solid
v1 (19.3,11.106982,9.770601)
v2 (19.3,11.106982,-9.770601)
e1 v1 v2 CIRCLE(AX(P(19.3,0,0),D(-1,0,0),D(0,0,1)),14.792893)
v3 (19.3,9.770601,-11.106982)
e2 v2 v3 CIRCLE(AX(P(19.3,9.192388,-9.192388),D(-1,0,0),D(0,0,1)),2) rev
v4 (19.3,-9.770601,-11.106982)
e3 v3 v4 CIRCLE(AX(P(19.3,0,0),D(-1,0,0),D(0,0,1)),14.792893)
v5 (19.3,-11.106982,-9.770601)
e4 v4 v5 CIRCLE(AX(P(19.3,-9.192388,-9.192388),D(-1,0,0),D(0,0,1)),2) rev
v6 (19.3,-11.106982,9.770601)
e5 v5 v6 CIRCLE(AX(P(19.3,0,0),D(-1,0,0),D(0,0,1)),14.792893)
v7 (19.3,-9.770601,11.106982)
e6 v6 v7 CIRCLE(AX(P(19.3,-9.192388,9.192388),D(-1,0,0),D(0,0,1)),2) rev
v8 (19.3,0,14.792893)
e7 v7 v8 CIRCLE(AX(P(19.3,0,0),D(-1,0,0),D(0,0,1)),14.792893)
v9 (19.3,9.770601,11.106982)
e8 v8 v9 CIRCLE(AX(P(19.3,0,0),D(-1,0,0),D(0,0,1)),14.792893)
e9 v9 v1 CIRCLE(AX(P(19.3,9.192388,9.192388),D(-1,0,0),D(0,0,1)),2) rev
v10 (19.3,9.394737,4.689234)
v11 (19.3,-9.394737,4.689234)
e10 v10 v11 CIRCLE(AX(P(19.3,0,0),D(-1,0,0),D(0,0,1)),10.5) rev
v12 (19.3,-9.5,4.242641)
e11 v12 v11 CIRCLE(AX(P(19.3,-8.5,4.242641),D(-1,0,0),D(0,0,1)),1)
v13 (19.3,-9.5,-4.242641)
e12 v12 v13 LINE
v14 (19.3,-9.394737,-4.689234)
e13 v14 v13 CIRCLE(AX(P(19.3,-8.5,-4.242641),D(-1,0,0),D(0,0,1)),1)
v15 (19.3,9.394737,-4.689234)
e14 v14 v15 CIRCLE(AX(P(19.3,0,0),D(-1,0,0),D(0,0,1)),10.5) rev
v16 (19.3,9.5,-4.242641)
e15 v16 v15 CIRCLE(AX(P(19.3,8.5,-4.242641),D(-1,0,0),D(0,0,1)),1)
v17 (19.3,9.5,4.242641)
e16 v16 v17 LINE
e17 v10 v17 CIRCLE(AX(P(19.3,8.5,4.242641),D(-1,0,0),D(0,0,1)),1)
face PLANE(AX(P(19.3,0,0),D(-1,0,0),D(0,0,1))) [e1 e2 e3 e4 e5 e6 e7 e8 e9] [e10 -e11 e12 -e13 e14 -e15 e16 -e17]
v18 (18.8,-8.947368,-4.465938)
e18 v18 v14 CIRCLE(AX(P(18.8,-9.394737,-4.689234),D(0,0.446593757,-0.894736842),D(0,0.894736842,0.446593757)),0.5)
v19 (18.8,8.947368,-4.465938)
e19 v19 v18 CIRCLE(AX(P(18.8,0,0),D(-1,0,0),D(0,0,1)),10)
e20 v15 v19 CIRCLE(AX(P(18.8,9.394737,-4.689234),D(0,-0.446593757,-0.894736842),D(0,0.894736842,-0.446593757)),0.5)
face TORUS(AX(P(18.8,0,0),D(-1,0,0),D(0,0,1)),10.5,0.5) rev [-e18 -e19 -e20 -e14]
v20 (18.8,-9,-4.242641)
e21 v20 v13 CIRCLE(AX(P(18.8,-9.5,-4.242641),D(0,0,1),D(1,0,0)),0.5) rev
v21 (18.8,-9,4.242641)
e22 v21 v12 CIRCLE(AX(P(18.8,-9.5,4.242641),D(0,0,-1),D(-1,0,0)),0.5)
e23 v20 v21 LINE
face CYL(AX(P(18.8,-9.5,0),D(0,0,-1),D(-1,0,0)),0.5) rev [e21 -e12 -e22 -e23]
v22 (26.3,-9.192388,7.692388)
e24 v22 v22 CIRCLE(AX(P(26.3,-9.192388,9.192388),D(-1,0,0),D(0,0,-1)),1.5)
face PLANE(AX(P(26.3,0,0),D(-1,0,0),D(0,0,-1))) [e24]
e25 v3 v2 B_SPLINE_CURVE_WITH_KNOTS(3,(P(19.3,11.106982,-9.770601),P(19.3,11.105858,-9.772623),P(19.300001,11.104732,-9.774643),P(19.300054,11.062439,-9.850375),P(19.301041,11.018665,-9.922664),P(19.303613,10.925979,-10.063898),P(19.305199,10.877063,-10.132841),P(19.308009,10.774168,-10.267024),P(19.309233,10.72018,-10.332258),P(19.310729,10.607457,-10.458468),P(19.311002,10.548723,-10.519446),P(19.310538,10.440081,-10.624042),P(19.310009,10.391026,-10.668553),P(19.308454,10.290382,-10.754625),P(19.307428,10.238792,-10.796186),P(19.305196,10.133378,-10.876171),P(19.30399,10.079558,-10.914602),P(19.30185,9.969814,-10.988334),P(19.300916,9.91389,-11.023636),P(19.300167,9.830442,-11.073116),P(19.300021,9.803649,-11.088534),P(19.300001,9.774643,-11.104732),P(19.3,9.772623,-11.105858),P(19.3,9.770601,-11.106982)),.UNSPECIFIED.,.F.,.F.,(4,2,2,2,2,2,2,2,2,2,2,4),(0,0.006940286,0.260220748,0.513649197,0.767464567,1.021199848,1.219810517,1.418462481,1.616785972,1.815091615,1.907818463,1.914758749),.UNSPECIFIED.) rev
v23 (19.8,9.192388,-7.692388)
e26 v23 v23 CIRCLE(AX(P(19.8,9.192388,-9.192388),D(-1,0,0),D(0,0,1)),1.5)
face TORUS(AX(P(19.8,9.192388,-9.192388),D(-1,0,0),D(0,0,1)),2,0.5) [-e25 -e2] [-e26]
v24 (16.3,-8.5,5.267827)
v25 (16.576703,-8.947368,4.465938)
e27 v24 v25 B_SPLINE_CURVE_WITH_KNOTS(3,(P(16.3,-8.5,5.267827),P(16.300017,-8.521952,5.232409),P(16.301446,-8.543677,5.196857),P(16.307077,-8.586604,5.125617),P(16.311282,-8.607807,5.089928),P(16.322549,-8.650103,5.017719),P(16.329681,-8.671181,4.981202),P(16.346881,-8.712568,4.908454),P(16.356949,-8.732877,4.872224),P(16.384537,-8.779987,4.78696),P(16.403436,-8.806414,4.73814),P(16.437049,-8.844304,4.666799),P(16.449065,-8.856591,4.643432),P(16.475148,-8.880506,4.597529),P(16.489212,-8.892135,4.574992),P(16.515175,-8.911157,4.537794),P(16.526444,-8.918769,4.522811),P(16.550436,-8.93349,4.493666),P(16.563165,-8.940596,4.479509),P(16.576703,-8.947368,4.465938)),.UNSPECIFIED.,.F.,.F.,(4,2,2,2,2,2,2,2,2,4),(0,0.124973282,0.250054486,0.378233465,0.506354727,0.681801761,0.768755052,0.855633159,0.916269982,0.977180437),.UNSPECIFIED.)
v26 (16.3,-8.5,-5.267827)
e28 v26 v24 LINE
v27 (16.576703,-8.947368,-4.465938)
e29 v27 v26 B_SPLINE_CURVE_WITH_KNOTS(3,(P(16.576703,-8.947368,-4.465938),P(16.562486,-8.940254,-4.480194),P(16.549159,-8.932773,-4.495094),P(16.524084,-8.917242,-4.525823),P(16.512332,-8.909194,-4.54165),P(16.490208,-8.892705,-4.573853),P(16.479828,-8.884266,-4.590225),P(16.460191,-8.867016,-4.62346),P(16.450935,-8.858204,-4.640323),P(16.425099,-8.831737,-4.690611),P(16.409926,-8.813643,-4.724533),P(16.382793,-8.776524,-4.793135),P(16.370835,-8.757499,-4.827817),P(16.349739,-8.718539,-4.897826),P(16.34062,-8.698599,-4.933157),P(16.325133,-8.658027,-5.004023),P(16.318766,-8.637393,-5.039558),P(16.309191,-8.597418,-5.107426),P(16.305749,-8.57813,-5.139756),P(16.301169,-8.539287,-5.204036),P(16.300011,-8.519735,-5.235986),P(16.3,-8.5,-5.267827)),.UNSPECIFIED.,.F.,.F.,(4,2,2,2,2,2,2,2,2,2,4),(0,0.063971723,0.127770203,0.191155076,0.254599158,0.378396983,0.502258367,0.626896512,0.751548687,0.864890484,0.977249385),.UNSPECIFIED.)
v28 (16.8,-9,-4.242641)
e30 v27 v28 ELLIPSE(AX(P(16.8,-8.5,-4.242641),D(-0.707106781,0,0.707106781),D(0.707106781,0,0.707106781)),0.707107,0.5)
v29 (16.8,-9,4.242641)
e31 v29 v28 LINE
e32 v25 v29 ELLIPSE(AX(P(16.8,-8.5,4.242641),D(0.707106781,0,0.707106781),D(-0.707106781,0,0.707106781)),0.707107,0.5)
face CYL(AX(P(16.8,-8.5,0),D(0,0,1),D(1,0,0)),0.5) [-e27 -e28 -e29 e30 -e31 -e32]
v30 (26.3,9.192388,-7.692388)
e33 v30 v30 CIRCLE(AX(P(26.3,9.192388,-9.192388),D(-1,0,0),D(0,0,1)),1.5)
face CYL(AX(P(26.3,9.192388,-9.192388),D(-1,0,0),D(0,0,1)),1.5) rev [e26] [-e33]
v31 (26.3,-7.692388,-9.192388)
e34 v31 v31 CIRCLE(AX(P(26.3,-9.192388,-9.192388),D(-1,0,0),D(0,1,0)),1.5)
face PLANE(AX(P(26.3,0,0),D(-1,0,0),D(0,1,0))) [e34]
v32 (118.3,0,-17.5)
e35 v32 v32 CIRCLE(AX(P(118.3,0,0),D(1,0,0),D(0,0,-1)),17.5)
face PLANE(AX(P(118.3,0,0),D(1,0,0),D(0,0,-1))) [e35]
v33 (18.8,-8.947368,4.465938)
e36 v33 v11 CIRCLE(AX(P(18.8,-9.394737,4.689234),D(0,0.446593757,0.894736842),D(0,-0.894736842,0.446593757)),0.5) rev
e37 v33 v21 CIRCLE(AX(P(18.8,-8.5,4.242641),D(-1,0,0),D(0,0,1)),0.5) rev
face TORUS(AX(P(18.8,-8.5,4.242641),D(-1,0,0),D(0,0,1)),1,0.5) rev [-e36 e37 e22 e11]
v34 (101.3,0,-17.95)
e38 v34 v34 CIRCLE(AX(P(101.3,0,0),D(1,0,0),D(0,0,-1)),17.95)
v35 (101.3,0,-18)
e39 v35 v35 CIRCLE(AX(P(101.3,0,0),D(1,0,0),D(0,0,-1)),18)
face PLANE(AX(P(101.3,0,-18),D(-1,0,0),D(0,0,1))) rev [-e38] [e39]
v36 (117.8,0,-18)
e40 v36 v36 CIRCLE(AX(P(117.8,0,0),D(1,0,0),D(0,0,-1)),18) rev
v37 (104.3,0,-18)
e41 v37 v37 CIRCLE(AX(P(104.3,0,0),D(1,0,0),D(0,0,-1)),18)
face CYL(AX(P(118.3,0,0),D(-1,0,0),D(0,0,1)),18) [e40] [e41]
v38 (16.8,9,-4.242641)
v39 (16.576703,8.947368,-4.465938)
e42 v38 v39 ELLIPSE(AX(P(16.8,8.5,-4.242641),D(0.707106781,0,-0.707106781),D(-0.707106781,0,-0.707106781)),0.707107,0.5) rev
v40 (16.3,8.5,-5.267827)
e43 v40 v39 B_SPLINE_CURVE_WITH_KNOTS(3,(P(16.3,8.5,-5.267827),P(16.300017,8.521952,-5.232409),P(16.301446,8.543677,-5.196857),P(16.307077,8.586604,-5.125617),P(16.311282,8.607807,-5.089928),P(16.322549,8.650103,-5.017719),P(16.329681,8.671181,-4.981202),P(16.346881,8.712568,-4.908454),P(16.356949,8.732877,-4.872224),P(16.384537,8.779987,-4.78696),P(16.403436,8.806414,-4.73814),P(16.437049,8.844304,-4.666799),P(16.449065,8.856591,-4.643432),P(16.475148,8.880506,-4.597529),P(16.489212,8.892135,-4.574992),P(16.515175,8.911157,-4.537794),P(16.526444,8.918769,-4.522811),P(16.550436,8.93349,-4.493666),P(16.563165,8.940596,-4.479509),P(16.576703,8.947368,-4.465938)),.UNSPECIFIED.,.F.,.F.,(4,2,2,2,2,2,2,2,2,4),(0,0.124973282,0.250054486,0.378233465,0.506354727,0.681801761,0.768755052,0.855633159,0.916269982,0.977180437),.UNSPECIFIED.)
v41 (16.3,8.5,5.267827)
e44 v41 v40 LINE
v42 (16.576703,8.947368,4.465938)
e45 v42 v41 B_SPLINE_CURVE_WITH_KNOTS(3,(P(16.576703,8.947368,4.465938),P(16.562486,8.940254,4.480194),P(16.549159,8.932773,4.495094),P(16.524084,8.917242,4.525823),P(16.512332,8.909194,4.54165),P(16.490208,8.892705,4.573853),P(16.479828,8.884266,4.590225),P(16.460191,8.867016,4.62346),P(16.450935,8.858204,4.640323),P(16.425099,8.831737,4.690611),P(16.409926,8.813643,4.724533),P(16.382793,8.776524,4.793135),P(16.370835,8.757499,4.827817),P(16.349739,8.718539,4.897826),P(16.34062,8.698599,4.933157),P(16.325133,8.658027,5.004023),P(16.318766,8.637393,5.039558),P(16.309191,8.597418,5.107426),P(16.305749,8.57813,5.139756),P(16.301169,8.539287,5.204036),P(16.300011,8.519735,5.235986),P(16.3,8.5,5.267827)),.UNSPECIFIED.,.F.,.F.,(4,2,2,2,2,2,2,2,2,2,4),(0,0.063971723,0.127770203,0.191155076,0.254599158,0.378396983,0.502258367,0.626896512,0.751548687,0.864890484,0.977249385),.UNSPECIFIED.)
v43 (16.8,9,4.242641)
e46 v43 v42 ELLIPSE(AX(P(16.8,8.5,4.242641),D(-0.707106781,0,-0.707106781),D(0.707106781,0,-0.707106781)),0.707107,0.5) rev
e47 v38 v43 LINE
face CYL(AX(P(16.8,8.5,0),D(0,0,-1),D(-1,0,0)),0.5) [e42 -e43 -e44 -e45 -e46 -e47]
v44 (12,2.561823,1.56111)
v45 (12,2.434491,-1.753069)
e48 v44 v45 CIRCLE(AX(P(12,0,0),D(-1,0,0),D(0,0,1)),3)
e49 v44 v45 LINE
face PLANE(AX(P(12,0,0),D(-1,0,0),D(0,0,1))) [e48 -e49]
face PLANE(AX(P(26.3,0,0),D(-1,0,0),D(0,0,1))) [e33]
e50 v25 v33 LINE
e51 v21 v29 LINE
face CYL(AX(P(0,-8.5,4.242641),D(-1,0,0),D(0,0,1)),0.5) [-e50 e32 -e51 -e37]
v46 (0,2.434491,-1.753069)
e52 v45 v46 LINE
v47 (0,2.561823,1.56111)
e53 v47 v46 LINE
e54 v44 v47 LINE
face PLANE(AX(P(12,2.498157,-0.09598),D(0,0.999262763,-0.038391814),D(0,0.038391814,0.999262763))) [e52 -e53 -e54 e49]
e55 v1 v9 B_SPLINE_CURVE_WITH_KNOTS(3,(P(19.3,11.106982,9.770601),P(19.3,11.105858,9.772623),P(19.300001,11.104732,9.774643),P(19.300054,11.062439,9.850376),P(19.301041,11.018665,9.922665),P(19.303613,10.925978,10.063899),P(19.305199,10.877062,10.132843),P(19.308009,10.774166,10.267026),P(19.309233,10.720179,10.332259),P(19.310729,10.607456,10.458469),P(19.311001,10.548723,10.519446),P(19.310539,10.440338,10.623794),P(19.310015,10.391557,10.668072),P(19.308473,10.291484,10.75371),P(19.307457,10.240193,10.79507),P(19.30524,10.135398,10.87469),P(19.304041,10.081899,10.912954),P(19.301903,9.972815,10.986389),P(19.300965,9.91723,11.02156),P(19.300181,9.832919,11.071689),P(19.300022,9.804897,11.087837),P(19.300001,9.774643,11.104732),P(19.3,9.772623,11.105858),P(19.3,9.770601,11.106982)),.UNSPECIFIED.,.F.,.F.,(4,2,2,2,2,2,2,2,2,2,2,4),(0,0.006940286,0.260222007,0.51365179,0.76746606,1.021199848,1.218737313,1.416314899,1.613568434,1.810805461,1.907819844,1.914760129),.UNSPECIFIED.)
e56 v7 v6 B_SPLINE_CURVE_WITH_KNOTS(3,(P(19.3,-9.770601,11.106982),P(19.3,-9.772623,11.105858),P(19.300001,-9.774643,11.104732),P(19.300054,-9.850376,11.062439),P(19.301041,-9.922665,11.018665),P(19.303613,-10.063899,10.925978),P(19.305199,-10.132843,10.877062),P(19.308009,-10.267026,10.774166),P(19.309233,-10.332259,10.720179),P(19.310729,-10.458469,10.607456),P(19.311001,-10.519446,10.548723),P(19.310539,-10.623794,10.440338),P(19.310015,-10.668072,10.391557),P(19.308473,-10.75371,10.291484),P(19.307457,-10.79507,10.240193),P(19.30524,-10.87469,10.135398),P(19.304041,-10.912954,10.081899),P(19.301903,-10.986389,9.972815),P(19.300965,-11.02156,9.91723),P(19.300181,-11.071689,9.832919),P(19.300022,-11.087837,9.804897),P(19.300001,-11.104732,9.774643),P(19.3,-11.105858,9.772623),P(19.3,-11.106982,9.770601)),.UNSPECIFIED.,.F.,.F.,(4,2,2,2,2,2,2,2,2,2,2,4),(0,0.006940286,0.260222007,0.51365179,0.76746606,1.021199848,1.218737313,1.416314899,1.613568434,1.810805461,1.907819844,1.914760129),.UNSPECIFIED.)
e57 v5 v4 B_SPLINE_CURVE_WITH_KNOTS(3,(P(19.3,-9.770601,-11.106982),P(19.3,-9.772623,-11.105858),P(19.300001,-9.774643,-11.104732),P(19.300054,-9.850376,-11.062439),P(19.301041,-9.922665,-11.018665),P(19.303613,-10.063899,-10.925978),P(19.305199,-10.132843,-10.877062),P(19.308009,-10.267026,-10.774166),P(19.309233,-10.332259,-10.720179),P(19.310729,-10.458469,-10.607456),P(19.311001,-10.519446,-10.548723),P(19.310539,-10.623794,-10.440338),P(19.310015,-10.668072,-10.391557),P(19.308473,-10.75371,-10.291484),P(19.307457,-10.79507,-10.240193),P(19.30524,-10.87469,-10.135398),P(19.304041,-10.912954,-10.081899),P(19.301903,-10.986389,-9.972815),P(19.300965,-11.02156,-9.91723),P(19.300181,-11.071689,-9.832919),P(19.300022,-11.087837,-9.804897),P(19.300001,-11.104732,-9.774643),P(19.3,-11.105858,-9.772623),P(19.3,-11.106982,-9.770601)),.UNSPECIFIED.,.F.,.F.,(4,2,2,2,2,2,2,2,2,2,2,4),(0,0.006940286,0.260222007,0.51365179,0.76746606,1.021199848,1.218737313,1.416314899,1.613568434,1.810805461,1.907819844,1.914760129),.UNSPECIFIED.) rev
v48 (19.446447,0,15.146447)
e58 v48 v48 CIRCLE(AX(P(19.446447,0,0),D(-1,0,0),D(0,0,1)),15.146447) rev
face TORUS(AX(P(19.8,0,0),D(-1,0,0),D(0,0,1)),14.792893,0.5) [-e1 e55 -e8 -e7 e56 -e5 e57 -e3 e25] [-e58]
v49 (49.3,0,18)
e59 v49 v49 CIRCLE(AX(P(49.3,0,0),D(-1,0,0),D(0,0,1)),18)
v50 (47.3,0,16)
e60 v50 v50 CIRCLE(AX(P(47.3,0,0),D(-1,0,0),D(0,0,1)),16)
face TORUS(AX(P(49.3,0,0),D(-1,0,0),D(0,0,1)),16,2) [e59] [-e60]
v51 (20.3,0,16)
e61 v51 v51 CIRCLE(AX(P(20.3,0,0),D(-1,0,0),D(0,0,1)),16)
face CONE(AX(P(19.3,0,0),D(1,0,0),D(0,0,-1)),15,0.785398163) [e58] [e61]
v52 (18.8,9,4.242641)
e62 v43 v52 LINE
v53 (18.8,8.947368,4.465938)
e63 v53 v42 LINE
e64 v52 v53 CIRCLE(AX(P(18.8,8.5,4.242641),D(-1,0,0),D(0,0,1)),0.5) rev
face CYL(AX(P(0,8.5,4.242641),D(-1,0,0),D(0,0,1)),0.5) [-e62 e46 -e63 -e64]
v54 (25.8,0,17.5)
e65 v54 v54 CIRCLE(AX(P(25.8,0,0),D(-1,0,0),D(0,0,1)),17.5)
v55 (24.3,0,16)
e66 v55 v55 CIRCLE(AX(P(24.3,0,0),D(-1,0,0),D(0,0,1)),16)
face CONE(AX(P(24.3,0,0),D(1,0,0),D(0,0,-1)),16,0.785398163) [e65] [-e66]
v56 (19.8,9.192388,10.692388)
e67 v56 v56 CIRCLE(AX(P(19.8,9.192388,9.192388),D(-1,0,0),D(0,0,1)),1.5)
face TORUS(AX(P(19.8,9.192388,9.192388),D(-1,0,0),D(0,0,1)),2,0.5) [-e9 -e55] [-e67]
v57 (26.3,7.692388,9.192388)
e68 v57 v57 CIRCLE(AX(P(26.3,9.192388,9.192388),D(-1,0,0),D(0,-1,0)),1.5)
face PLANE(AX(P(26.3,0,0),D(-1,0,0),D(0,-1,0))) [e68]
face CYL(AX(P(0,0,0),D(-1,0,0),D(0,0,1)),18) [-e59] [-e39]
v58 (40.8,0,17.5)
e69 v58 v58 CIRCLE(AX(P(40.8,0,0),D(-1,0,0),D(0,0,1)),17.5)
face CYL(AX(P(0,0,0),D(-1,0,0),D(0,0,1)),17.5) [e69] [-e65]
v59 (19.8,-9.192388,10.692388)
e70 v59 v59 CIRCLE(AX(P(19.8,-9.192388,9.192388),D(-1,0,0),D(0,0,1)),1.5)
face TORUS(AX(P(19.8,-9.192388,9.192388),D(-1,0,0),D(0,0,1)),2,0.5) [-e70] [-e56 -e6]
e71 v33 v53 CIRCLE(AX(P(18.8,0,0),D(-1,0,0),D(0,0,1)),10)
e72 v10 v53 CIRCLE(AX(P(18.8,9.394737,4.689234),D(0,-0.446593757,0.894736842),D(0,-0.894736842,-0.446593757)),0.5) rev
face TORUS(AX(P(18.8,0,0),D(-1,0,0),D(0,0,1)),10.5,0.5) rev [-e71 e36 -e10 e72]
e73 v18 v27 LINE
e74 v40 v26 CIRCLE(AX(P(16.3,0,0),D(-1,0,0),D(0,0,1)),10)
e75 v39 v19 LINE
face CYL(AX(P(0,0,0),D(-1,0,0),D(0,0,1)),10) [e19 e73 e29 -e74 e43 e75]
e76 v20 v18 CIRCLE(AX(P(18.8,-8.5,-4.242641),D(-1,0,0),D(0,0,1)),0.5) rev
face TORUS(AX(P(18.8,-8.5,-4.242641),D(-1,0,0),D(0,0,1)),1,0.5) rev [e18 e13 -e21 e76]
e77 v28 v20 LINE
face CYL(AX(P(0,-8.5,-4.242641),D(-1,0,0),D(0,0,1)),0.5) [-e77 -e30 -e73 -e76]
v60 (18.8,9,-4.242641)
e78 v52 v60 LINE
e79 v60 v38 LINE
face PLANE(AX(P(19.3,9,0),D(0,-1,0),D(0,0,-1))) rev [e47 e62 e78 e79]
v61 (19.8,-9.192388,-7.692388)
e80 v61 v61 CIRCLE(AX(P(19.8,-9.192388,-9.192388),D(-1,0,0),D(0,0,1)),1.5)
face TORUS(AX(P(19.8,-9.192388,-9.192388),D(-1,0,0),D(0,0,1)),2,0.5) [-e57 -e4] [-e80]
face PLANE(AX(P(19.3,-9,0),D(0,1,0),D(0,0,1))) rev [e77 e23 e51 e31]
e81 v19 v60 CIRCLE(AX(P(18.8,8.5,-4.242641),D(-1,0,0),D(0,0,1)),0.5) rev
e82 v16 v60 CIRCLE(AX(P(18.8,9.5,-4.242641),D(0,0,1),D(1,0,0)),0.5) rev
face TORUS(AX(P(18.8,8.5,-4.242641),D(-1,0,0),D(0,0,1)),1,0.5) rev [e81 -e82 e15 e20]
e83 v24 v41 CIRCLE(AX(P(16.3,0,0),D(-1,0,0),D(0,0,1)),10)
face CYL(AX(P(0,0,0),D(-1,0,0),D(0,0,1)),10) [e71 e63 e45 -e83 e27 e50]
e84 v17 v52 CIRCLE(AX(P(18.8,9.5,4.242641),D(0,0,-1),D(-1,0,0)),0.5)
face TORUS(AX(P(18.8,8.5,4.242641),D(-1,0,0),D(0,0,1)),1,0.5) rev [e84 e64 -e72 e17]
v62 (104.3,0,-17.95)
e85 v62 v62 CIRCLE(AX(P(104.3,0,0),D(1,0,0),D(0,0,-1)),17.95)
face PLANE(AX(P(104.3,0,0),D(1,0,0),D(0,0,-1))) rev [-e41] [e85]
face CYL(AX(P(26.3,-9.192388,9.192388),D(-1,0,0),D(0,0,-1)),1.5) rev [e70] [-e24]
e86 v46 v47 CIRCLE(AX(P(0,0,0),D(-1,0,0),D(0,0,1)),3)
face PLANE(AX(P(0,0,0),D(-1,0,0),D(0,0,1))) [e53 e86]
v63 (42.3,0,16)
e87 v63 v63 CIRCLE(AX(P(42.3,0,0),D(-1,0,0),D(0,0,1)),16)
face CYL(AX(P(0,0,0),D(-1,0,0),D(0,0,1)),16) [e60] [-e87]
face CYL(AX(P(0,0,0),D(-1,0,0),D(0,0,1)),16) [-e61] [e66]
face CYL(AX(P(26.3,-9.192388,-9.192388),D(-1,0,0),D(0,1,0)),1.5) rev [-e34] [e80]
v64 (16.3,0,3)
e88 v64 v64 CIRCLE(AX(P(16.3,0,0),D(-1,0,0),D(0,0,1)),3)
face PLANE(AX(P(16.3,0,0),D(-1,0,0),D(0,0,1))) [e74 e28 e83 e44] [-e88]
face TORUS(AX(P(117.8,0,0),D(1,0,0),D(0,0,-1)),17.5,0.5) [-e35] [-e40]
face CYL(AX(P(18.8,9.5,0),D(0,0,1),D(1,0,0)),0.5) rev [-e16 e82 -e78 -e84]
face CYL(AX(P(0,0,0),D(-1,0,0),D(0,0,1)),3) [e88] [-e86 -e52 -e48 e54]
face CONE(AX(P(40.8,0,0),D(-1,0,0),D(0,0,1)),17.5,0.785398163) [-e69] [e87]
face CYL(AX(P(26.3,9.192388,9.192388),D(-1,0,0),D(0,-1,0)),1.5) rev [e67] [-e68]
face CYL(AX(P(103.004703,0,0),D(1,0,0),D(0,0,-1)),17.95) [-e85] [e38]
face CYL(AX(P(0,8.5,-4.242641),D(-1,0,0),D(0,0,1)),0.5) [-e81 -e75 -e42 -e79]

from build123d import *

# Parameters (mm, degrees)
SKETCH_1_W               = 16.3
SKETCH_1_H               = 3
SKETCH_1_W_2             = 5
SKETCH_1_H_2             = 16
SKETCH_19_W              = 3
SKETCH_19_H              = 0.05
EXTRUDE_START            = 14
SKETCH_20_R              = 18
EXTRUDE_2_DEPTH          = 14
CUT_EXTRUDE_6_DEPTH      = 3
CUT_EXTRUDE_4_DEPTH      = 12
SKETCH_13_R              = 1.5
CUT_EXTRUDE_8_DEPTH      = 7
PATTERN_CIRCULAR_2_COUNT = 4
FILLET_1_R               = 0.5


with BuildPart() as part:
    # Эскиз1 → Повернуть1 основной корпус (revolve)
    with BuildSketch(Plane(origin=(0, 0, 0), x_dir=(1, 0, 0), z_dir=(0, 1, 0)), mode=Mode.PRIVATE) as revolve_1_sk:
        with Locations((8.15, 1.5)):
            Rectangle(SKETCH_1_W, SKETCH_1_H)
        Polygon((16.3, 0), (19.3, 0), (19.3, 10), (16.3, 10), (16.3, 3), align=None)
        Polygon((24.3, 0), (24.3, 16), (20.3, 16), (19.3, 15), (19.3, 10), (19.3, 0), align=None)
        Polygon((40.8, 17.5), (42.3, 16), (42.3, 0), (24.3, 0), (24.3, 16), (25.8, 17.5), align=None)
        with Locations((44.8, 8)):
            Rectangle(SKETCH_1_W_2, SKETCH_1_H_2)
        with BuildLine():
            ThreePointArc((47.3, 16), (47.885786438, 17.414213562), (49.3, 18))
            Line((49.3, 18), (104.3, 18))
            Line((104.3, 18), (104.3, 0))
            Line((104.3, 0), (47.3, 0))
            Line((47.3, 0), (47.3, 16))
        make_face()
    revolve(revolve_1_sk.sketch.rotate(Axis((0, 0, 0), (1, 0, 0)), 180), axis=Axis((0, 0, 0), (1, 0, 0)))

    # Эскиз19 → Вырез-Повернуть2 пластиковая часть (revolve, cut)
    with BuildSketch(Plane(origin=(0, 0, 0), x_dir=(1, 0, 0), z_dir=(0, 1, 0)), mode=Mode.PRIVATE) as cut_revolve_2_sk:
        with Locations((102.8, 17.975)):
            Rectangle(SKETCH_19_W, SKETCH_19_H)
    revolve(cut_revolve_2_sk.sketch.rotate(Axis((103.004702911, 0, 0), (-1, 0, 0)), 180), axis=Axis((103.004702911, 0, 0), (-1, 0, 0)), mode=Mode.SUBTRACT)

    # Эскиз20 → Бобышка-Вытянуть2 пластиковая крышка контактов (add)
    with BuildSketch(Plane(origin=(104.3, 0, 0), x_dir=(0, 0, -1), z_dir=(1, 0, 0)).offset(EXTRUDE_START)):
        with Locations(Location((0, 0, 0), (0, 0, 180))):
            Circle(SKETCH_20_R)
    extrude(amount=-EXTRUDE_2_DEPTH)

    # Эскиз11 → Вырез-Вытянуть6 (cut)
    with BuildSketch(Plane.ZY.offset(-16.3)):
        with BuildLine():
            ThreePointArc((4.358898944, 9), (0, 10), (-4.358898944, 9))
            Line((-4.358898944, 9), (4.358898944, 9))
        make_face()
        with BuildLine():
            Line((4.358898944, -9), (-4.358898944, -9))
            ThreePointArc((-4.358898944, -9), (0, -10), (4.358898944, -9))
        make_face()
    extrude(amount=-CUT_EXTRUDE_6_DEPTH, mode=Mode.SUBTRACT)

    # Эскиз6 → Вырез-Вытянуть4 на оси (cut)
    with BuildSketch(Plane.ZY):
        with BuildLine():
            Line((-1.75306936, 2.434491286), (1.561110291, 2.561822527))
            ThreePointArc((1.561110291, 2.561822527), (-0.115175441, 2.997788288), (-1.75306936, 2.434491286))
        make_face()
    extrude(amount=-CUT_EXTRUDE_4_DEPTH, mode=Mode.SUBTRACT)

    # Эскиз13 → Вырез-Вытянуть8 для винтов (cut)
    with BuildSketch(Plane.ZY.offset(-19.3)):
        with Locations((-9.192388155, 9.192388155)):
            Circle(SKETCH_13_R)
    cut_extrude_8 = extrude(amount=-CUT_EXTRUDE_8_DEPTH, mode=Mode.SUBTRACT)

    # Круговой массив2 для винтов: Вырез-Вытянуть8 для винтов ×4 about axis
    pattern_circular_2_axis = Axis((0, 0, 0), (1, 0, 0))
    for i in range(1, PATTERN_CIRCULAR_2_COUNT):
        add(cut_extrude_8.rotate(pattern_circular_2_axis, i * 360 / PATTERN_CIRCULAR_2_COUNT), mode=Mode.SUBTRACT)

    # Скругление1
    # the kernel refuses this fillet: 0.5 mm, written as the material it takes off along each edge
    with BuildSketch(Plane(origin=(19.3, 0, 0), x_dir=(0, 0, 1), z_dir=(0, 1, 0))) as fillet_1_piece_1:
        with BuildLine():
            CenterArc((15 - FILLET_1_R * 0.414213562373, FILLET_1_R), FILLET_1_R, 270, 45)
            Line((15 - FILLET_1_R * 0.414213562373, 0), (15, 0))
            Line((15, 0), (15 + FILLET_1_R * 0.292893218813, FILLET_1_R * 0.292893218813))
        make_face()
    revolve(axis=Axis((19.3, 0, 0), (1, 0, 0)), mode=Mode.SUBTRACT)
    with BuildSketch(Plane(origin=(118.3, 0, 0), x_dir=(0, 0, 1), z_dir=(0, 1, 0))) as fillet_1_piece_2:
        with BuildLine():
            CenterArc((18 - FILLET_1_R, -FILLET_1_R), FILLET_1_R, 0, 90)
            Line((18 - FILLET_1_R, 0), (18, 0))
            Line((18, 0), (18, -FILLET_1_R))
        make_face()
    revolve(axis=Axis((118.3, 0, 0), (1, 0, 0)), mode=Mode.SUBTRACT)
    with BuildSketch(Plane(origin=(16.001803864, 9, -4.358898944), x_dir=(0, 0, 1), z_dir=(1, 0, 0))) as fillet_1_piece_3:
        with BuildLine():
            CenterArc((0.116258256, 0.5), FILLET_1_R, 243.474647983, 26.525352017)
            ThreePointArc((-0.107038622, 0.052631579), (-0.053597784, 0.026156196), (0, 0))
            Line((0, 0), (0.116258256, 0))
        make_face()
    extrude(amount=3.298196136, mode=Mode.SUBTRACT)
    with BuildSketch(Plane(origin=(16.001803864, 9, 4.358898944), x_dir=(0, -0.4412496727830022, 0.8973843804462464), z_dir=(1, 0, 0))) as fillet_1_piece_4:
        with BuildLine():
            CenterArc((0.116296493, 0.499991108), FILLET_1_R, 243.81635761, 26.525352017)
            Line((-0.104328343, 0.051298918), (0, 0))
            ThreePointArc((0, 0), (0.059639227, -0.000177843), (0.119278454, 0))
        make_face()
    extrude(amount=3.298196136, mode=Mode.SUBTRACT)
    with BuildSketch(Plane(origin=(16.3, 9, -5.608898944), x_dir=(1, 0, 0), z_dir=(0, 0, 1)), Plane(origin=(16.3, -9, 5.608898944), x_dir=(1, 0, 0), z_dir=(0, 0, -1))) as fillet_1_piece_5:
        with BuildLine():
            CenterArc((FILLET_1_R, -FILLET_1_R), FILLET_1_R, 90, 90)
            Line((0, -FILLET_1_R), (0, 0))
            Line((0, 0), (FILLET_1_R, 0))
        make_face()
    extrude(amount=11.217797887, mode=Mode.SUBTRACT)
    with BuildSketch(Plane(origin=(16.001803864, -9, 4.358898944), x_dir=(0, 0.4412496727830018, 0.8973843804462466), z_dir=(1, 0, 0))) as fillet_1_piece_6:
        with BuildLine():
            CenterArc((0.116296493, -0.499991108), FILLET_1_R, 89.658290373, 26.525352017)
            Line((-0.104328343, -0.051298918), (0, 0))
            ThreePointArc((0, 0), (0.059639227, 0.000177843), (0.119278454, 0))
        make_face()
    extrude(amount=3.298196136, mode=Mode.SUBTRACT)
    with BuildSketch(Plane(origin=(16.001803864, -9, -4.358898944), x_dir=(0, 0, 1), z_dir=(1, 0, 0))) as fillet_1_piece_7:
        with BuildLine():
            CenterArc((0.116258256, -0.5), FILLET_1_R, 90, 26.525352017)
            ThreePointArc((-0.107038622, -0.052631579), (-0.053597784, -0.026156196), (0, 0))
            Line((0, 0), (0.116258256, 0))
        make_face()
    extrude(amount=3.298196136, mode=Mode.SUBTRACT)
    with BuildSketch(Plane(origin=(19.3, 9.192388155, -9.192388155), x_dir=(0, 0, 1), z_dir=(0, -1, 0))) as fillet_1_piece_8:
        with BuildLine():
            CenterArc((1.5 + FILLET_1_R, -FILLET_1_R), FILLET_1_R, 90, 90)
            Line((1.5, -FILLET_1_R), (1.5, 0))
            Line((1.5, 0), (1.5 + FILLET_1_R, 0))
        make_face()
    revolve(axis=Axis((19.3, 9.192388155, -9.192388155), (-1, 0, 0)), mode=Mode.SUBTRACT)
    with BuildSketch(Plane(origin=(19.3, -9.192388155, -9.192388155), x_dir=(0, 1, 0), z_dir=(0, 0, 1))) as fillet_1_piece_9:
        with BuildLine():
            CenterArc((1.5 + FILLET_1_R, -FILLET_1_R), FILLET_1_R, 90, 90)
            Line((1.5, -FILLET_1_R), (1.5, 0))
            Line((1.5, 0), (1.5 + FILLET_1_R, 0))
        make_face()
    revolve(axis=Axis((19.3, -9.192388155, -9.192388155), (-1, 0, 0)), mode=Mode.SUBTRACT)
    with BuildSketch(Plane(origin=(19.3, -9.192388155, 9.192388155), x_dir=(0, 0, -1), z_dir=(0, 1, 0))) as fillet_1_piece_10:
        with BuildLine():
            CenterArc((1.5 + FILLET_1_R, -FILLET_1_R), FILLET_1_R, 90, 90)
            Line((1.5, -FILLET_1_R), (1.5, 0))
            Line((1.5, 0), (1.5 + FILLET_1_R, 0))
        make_face()
    revolve(axis=Axis((19.3, -9.192388155, 9.192388155), (-1, 0, 0)), mode=Mode.SUBTRACT)
    with BuildSketch(Plane(origin=(19.3, 9.192388155, 9.192388155), x_dir=(0, -1, 0), z_dir=(0, 0, -1))) as fillet_1_piece_11:
        with BuildLine():
            CenterArc((1.5 + FILLET_1_R, -FILLET_1_R), FILLET_1_R, 90, 90)
            Line((1.5, -FILLET_1_R), (1.5, 0))
            Line((1.5, 0), (1.5 + FILLET_1_R, 0))
        make_face()
    revolve(axis=Axis((19.3, 9.192388155, 9.192388155), (-1, 0, 0)), mode=Mode.SUBTRACT)
    # the kernel refuses this fillet: 0.5 mm, written as the material it adds along each edge
    with BuildSketch(Plane(origin=(19.3, 0, 0), x_dir=(0, -0.8947368421052432, -0.4465937565389121), z_dir=(0, -0.4465937565389121, 0.8947368421052432))) as fillet_1_2_piece_1:
        with BuildLine():
            CenterArc((10 + FILLET_1_R, -FILLET_1_R), FILLET_1_R, 90, 90)
            Line((10, -FILLET_1_R), (10, 0))
            Line((10, 0), (10 + FILLET_1_R, 0))
        make_face()
    revolve(axis=Axis((19.3, 0, 0), (1, 0, 0)), revolution_arc=126.949295967)
    with BuildSketch(Plane(origin=(19.3, 9, -4.242640687), x_dir=(0, 1, 0), z_dir=(0, 0, 1)), Plane(origin=(19.3, -9, 4.242640687), x_dir=(0, -1, 0), z_dir=(0, 0, -1))) as fillet_1_2_piece_2:
        with BuildLine():
            CenterArc((FILLET_1_R, FILLET_1_R), FILLET_1_R, 180, 90)
            Line((0, FILLET_1_R), (0, 0))
            Line((0, 0), (FILLET_1_R, 0))
        make_face()
    extrude(amount=8.485281374)
    with BuildSketch(Plane(origin=(19.3, 0, 0), x_dir=(0, 0.894736842105243, 0.44659375653891253), z_dir=(0, 0.44659375653891253, -0.894736842105243))) as fillet_1_2_piece_3:
        with BuildLine():
            CenterArc((10 + FILLET_1_R, -FILLET_1_R), FILLET_1_R, 90, 90)
            Line((10, -FILLET_1_R), (10, 0))
            Line((10, 0), (10 + FILLET_1_R, 0))
        make_face()
    revolve(axis=Axis((19.3, 0, 0), (1, 0, 0)), revolution_arc=126.949295967)
    with BuildSketch(Plane(origin=(19.3, -8.5, 4.242640687), x_dir=(0, -0.8947368421052433, 0.446593756538912), z_dir=(0, 0.446593756538912, 0.8947368421052433))) as fillet_1_2_piece_4:
        with BuildLine():
            CenterArc((0.5 + FILLET_1_R, -FILLET_1_R), FILLET_1_R, 90, 90)
            Line((0.5, -FILLET_1_R), (0.5, 0))
            Line((0.5, 0), (0.5 + FILLET_1_R, 0))
        make_face()
    revolve(axis=Axis((19.3, -8.5, 4.242640687), (1, 0, 0)), revolution_arc=26.525352017)
    with BuildSketch(Plane(origin=(19.3, -8.5, -4.242640687), x_dir=(0, -1, 0), z_dir=(0, 0, 1))) as fillet_1_2_piece_5:
        with BuildLine():
            CenterArc((0.5 + FILLET_1_R, -FILLET_1_R), FILLET_1_R, 90, 90)
            Line((0.5, -FILLET_1_R), (0.5, 0))
            Line((0.5, 0), (0.5 + FILLET_1_R, 0))
        make_face()
    revolve(axis=Axis((19.3, -8.5, -4.242640687), (1, 0, 0)), revolution_arc=26.525352017)
    with BuildSketch(Plane(origin=(19.3, 8.5, 4.242640687), x_dir=(0, 0.8947368421052433, 0.446593756538912), z_dir=(0, -0.446593756538912, 0.8947368421052433))) as fillet_1_2_piece_6:
        with BuildLine():
            CenterArc((0.5 + FILLET_1_R, FILLET_1_R), FILLET_1_R, 180, 90)
            Line((0.5, FILLET_1_R), (0.5, 0))
            Line((0.5, 0), (0.5 + FILLET_1_R, 0))
        make_face()
    revolve(axis=Axis((19.3, 8.5, 4.242640687), (-1, 0, 0)), revolution_arc=26.525352017)
    with BuildSketch(Plane(origin=(19.3, 8.5, -4.242640687), x_dir=(0, 1, 0), z_dir=(0, 0, 1))) as fillet_1_2_piece_7:
        with BuildLine():
            CenterArc((0.5 + FILLET_1_R, FILLET_1_R), FILLET_1_R, 180, 90)
            Line((0.5, FILLET_1_R), (0.5, 0))
            Line((0.5, 0), (0.5 + FILLET_1_R, 0))
        make_face()
    revolve(axis=Axis((19.3, 8.5, -4.242640687), (-1, 0, 0)), revolution_arc=26.525352017)


solid = part.part
